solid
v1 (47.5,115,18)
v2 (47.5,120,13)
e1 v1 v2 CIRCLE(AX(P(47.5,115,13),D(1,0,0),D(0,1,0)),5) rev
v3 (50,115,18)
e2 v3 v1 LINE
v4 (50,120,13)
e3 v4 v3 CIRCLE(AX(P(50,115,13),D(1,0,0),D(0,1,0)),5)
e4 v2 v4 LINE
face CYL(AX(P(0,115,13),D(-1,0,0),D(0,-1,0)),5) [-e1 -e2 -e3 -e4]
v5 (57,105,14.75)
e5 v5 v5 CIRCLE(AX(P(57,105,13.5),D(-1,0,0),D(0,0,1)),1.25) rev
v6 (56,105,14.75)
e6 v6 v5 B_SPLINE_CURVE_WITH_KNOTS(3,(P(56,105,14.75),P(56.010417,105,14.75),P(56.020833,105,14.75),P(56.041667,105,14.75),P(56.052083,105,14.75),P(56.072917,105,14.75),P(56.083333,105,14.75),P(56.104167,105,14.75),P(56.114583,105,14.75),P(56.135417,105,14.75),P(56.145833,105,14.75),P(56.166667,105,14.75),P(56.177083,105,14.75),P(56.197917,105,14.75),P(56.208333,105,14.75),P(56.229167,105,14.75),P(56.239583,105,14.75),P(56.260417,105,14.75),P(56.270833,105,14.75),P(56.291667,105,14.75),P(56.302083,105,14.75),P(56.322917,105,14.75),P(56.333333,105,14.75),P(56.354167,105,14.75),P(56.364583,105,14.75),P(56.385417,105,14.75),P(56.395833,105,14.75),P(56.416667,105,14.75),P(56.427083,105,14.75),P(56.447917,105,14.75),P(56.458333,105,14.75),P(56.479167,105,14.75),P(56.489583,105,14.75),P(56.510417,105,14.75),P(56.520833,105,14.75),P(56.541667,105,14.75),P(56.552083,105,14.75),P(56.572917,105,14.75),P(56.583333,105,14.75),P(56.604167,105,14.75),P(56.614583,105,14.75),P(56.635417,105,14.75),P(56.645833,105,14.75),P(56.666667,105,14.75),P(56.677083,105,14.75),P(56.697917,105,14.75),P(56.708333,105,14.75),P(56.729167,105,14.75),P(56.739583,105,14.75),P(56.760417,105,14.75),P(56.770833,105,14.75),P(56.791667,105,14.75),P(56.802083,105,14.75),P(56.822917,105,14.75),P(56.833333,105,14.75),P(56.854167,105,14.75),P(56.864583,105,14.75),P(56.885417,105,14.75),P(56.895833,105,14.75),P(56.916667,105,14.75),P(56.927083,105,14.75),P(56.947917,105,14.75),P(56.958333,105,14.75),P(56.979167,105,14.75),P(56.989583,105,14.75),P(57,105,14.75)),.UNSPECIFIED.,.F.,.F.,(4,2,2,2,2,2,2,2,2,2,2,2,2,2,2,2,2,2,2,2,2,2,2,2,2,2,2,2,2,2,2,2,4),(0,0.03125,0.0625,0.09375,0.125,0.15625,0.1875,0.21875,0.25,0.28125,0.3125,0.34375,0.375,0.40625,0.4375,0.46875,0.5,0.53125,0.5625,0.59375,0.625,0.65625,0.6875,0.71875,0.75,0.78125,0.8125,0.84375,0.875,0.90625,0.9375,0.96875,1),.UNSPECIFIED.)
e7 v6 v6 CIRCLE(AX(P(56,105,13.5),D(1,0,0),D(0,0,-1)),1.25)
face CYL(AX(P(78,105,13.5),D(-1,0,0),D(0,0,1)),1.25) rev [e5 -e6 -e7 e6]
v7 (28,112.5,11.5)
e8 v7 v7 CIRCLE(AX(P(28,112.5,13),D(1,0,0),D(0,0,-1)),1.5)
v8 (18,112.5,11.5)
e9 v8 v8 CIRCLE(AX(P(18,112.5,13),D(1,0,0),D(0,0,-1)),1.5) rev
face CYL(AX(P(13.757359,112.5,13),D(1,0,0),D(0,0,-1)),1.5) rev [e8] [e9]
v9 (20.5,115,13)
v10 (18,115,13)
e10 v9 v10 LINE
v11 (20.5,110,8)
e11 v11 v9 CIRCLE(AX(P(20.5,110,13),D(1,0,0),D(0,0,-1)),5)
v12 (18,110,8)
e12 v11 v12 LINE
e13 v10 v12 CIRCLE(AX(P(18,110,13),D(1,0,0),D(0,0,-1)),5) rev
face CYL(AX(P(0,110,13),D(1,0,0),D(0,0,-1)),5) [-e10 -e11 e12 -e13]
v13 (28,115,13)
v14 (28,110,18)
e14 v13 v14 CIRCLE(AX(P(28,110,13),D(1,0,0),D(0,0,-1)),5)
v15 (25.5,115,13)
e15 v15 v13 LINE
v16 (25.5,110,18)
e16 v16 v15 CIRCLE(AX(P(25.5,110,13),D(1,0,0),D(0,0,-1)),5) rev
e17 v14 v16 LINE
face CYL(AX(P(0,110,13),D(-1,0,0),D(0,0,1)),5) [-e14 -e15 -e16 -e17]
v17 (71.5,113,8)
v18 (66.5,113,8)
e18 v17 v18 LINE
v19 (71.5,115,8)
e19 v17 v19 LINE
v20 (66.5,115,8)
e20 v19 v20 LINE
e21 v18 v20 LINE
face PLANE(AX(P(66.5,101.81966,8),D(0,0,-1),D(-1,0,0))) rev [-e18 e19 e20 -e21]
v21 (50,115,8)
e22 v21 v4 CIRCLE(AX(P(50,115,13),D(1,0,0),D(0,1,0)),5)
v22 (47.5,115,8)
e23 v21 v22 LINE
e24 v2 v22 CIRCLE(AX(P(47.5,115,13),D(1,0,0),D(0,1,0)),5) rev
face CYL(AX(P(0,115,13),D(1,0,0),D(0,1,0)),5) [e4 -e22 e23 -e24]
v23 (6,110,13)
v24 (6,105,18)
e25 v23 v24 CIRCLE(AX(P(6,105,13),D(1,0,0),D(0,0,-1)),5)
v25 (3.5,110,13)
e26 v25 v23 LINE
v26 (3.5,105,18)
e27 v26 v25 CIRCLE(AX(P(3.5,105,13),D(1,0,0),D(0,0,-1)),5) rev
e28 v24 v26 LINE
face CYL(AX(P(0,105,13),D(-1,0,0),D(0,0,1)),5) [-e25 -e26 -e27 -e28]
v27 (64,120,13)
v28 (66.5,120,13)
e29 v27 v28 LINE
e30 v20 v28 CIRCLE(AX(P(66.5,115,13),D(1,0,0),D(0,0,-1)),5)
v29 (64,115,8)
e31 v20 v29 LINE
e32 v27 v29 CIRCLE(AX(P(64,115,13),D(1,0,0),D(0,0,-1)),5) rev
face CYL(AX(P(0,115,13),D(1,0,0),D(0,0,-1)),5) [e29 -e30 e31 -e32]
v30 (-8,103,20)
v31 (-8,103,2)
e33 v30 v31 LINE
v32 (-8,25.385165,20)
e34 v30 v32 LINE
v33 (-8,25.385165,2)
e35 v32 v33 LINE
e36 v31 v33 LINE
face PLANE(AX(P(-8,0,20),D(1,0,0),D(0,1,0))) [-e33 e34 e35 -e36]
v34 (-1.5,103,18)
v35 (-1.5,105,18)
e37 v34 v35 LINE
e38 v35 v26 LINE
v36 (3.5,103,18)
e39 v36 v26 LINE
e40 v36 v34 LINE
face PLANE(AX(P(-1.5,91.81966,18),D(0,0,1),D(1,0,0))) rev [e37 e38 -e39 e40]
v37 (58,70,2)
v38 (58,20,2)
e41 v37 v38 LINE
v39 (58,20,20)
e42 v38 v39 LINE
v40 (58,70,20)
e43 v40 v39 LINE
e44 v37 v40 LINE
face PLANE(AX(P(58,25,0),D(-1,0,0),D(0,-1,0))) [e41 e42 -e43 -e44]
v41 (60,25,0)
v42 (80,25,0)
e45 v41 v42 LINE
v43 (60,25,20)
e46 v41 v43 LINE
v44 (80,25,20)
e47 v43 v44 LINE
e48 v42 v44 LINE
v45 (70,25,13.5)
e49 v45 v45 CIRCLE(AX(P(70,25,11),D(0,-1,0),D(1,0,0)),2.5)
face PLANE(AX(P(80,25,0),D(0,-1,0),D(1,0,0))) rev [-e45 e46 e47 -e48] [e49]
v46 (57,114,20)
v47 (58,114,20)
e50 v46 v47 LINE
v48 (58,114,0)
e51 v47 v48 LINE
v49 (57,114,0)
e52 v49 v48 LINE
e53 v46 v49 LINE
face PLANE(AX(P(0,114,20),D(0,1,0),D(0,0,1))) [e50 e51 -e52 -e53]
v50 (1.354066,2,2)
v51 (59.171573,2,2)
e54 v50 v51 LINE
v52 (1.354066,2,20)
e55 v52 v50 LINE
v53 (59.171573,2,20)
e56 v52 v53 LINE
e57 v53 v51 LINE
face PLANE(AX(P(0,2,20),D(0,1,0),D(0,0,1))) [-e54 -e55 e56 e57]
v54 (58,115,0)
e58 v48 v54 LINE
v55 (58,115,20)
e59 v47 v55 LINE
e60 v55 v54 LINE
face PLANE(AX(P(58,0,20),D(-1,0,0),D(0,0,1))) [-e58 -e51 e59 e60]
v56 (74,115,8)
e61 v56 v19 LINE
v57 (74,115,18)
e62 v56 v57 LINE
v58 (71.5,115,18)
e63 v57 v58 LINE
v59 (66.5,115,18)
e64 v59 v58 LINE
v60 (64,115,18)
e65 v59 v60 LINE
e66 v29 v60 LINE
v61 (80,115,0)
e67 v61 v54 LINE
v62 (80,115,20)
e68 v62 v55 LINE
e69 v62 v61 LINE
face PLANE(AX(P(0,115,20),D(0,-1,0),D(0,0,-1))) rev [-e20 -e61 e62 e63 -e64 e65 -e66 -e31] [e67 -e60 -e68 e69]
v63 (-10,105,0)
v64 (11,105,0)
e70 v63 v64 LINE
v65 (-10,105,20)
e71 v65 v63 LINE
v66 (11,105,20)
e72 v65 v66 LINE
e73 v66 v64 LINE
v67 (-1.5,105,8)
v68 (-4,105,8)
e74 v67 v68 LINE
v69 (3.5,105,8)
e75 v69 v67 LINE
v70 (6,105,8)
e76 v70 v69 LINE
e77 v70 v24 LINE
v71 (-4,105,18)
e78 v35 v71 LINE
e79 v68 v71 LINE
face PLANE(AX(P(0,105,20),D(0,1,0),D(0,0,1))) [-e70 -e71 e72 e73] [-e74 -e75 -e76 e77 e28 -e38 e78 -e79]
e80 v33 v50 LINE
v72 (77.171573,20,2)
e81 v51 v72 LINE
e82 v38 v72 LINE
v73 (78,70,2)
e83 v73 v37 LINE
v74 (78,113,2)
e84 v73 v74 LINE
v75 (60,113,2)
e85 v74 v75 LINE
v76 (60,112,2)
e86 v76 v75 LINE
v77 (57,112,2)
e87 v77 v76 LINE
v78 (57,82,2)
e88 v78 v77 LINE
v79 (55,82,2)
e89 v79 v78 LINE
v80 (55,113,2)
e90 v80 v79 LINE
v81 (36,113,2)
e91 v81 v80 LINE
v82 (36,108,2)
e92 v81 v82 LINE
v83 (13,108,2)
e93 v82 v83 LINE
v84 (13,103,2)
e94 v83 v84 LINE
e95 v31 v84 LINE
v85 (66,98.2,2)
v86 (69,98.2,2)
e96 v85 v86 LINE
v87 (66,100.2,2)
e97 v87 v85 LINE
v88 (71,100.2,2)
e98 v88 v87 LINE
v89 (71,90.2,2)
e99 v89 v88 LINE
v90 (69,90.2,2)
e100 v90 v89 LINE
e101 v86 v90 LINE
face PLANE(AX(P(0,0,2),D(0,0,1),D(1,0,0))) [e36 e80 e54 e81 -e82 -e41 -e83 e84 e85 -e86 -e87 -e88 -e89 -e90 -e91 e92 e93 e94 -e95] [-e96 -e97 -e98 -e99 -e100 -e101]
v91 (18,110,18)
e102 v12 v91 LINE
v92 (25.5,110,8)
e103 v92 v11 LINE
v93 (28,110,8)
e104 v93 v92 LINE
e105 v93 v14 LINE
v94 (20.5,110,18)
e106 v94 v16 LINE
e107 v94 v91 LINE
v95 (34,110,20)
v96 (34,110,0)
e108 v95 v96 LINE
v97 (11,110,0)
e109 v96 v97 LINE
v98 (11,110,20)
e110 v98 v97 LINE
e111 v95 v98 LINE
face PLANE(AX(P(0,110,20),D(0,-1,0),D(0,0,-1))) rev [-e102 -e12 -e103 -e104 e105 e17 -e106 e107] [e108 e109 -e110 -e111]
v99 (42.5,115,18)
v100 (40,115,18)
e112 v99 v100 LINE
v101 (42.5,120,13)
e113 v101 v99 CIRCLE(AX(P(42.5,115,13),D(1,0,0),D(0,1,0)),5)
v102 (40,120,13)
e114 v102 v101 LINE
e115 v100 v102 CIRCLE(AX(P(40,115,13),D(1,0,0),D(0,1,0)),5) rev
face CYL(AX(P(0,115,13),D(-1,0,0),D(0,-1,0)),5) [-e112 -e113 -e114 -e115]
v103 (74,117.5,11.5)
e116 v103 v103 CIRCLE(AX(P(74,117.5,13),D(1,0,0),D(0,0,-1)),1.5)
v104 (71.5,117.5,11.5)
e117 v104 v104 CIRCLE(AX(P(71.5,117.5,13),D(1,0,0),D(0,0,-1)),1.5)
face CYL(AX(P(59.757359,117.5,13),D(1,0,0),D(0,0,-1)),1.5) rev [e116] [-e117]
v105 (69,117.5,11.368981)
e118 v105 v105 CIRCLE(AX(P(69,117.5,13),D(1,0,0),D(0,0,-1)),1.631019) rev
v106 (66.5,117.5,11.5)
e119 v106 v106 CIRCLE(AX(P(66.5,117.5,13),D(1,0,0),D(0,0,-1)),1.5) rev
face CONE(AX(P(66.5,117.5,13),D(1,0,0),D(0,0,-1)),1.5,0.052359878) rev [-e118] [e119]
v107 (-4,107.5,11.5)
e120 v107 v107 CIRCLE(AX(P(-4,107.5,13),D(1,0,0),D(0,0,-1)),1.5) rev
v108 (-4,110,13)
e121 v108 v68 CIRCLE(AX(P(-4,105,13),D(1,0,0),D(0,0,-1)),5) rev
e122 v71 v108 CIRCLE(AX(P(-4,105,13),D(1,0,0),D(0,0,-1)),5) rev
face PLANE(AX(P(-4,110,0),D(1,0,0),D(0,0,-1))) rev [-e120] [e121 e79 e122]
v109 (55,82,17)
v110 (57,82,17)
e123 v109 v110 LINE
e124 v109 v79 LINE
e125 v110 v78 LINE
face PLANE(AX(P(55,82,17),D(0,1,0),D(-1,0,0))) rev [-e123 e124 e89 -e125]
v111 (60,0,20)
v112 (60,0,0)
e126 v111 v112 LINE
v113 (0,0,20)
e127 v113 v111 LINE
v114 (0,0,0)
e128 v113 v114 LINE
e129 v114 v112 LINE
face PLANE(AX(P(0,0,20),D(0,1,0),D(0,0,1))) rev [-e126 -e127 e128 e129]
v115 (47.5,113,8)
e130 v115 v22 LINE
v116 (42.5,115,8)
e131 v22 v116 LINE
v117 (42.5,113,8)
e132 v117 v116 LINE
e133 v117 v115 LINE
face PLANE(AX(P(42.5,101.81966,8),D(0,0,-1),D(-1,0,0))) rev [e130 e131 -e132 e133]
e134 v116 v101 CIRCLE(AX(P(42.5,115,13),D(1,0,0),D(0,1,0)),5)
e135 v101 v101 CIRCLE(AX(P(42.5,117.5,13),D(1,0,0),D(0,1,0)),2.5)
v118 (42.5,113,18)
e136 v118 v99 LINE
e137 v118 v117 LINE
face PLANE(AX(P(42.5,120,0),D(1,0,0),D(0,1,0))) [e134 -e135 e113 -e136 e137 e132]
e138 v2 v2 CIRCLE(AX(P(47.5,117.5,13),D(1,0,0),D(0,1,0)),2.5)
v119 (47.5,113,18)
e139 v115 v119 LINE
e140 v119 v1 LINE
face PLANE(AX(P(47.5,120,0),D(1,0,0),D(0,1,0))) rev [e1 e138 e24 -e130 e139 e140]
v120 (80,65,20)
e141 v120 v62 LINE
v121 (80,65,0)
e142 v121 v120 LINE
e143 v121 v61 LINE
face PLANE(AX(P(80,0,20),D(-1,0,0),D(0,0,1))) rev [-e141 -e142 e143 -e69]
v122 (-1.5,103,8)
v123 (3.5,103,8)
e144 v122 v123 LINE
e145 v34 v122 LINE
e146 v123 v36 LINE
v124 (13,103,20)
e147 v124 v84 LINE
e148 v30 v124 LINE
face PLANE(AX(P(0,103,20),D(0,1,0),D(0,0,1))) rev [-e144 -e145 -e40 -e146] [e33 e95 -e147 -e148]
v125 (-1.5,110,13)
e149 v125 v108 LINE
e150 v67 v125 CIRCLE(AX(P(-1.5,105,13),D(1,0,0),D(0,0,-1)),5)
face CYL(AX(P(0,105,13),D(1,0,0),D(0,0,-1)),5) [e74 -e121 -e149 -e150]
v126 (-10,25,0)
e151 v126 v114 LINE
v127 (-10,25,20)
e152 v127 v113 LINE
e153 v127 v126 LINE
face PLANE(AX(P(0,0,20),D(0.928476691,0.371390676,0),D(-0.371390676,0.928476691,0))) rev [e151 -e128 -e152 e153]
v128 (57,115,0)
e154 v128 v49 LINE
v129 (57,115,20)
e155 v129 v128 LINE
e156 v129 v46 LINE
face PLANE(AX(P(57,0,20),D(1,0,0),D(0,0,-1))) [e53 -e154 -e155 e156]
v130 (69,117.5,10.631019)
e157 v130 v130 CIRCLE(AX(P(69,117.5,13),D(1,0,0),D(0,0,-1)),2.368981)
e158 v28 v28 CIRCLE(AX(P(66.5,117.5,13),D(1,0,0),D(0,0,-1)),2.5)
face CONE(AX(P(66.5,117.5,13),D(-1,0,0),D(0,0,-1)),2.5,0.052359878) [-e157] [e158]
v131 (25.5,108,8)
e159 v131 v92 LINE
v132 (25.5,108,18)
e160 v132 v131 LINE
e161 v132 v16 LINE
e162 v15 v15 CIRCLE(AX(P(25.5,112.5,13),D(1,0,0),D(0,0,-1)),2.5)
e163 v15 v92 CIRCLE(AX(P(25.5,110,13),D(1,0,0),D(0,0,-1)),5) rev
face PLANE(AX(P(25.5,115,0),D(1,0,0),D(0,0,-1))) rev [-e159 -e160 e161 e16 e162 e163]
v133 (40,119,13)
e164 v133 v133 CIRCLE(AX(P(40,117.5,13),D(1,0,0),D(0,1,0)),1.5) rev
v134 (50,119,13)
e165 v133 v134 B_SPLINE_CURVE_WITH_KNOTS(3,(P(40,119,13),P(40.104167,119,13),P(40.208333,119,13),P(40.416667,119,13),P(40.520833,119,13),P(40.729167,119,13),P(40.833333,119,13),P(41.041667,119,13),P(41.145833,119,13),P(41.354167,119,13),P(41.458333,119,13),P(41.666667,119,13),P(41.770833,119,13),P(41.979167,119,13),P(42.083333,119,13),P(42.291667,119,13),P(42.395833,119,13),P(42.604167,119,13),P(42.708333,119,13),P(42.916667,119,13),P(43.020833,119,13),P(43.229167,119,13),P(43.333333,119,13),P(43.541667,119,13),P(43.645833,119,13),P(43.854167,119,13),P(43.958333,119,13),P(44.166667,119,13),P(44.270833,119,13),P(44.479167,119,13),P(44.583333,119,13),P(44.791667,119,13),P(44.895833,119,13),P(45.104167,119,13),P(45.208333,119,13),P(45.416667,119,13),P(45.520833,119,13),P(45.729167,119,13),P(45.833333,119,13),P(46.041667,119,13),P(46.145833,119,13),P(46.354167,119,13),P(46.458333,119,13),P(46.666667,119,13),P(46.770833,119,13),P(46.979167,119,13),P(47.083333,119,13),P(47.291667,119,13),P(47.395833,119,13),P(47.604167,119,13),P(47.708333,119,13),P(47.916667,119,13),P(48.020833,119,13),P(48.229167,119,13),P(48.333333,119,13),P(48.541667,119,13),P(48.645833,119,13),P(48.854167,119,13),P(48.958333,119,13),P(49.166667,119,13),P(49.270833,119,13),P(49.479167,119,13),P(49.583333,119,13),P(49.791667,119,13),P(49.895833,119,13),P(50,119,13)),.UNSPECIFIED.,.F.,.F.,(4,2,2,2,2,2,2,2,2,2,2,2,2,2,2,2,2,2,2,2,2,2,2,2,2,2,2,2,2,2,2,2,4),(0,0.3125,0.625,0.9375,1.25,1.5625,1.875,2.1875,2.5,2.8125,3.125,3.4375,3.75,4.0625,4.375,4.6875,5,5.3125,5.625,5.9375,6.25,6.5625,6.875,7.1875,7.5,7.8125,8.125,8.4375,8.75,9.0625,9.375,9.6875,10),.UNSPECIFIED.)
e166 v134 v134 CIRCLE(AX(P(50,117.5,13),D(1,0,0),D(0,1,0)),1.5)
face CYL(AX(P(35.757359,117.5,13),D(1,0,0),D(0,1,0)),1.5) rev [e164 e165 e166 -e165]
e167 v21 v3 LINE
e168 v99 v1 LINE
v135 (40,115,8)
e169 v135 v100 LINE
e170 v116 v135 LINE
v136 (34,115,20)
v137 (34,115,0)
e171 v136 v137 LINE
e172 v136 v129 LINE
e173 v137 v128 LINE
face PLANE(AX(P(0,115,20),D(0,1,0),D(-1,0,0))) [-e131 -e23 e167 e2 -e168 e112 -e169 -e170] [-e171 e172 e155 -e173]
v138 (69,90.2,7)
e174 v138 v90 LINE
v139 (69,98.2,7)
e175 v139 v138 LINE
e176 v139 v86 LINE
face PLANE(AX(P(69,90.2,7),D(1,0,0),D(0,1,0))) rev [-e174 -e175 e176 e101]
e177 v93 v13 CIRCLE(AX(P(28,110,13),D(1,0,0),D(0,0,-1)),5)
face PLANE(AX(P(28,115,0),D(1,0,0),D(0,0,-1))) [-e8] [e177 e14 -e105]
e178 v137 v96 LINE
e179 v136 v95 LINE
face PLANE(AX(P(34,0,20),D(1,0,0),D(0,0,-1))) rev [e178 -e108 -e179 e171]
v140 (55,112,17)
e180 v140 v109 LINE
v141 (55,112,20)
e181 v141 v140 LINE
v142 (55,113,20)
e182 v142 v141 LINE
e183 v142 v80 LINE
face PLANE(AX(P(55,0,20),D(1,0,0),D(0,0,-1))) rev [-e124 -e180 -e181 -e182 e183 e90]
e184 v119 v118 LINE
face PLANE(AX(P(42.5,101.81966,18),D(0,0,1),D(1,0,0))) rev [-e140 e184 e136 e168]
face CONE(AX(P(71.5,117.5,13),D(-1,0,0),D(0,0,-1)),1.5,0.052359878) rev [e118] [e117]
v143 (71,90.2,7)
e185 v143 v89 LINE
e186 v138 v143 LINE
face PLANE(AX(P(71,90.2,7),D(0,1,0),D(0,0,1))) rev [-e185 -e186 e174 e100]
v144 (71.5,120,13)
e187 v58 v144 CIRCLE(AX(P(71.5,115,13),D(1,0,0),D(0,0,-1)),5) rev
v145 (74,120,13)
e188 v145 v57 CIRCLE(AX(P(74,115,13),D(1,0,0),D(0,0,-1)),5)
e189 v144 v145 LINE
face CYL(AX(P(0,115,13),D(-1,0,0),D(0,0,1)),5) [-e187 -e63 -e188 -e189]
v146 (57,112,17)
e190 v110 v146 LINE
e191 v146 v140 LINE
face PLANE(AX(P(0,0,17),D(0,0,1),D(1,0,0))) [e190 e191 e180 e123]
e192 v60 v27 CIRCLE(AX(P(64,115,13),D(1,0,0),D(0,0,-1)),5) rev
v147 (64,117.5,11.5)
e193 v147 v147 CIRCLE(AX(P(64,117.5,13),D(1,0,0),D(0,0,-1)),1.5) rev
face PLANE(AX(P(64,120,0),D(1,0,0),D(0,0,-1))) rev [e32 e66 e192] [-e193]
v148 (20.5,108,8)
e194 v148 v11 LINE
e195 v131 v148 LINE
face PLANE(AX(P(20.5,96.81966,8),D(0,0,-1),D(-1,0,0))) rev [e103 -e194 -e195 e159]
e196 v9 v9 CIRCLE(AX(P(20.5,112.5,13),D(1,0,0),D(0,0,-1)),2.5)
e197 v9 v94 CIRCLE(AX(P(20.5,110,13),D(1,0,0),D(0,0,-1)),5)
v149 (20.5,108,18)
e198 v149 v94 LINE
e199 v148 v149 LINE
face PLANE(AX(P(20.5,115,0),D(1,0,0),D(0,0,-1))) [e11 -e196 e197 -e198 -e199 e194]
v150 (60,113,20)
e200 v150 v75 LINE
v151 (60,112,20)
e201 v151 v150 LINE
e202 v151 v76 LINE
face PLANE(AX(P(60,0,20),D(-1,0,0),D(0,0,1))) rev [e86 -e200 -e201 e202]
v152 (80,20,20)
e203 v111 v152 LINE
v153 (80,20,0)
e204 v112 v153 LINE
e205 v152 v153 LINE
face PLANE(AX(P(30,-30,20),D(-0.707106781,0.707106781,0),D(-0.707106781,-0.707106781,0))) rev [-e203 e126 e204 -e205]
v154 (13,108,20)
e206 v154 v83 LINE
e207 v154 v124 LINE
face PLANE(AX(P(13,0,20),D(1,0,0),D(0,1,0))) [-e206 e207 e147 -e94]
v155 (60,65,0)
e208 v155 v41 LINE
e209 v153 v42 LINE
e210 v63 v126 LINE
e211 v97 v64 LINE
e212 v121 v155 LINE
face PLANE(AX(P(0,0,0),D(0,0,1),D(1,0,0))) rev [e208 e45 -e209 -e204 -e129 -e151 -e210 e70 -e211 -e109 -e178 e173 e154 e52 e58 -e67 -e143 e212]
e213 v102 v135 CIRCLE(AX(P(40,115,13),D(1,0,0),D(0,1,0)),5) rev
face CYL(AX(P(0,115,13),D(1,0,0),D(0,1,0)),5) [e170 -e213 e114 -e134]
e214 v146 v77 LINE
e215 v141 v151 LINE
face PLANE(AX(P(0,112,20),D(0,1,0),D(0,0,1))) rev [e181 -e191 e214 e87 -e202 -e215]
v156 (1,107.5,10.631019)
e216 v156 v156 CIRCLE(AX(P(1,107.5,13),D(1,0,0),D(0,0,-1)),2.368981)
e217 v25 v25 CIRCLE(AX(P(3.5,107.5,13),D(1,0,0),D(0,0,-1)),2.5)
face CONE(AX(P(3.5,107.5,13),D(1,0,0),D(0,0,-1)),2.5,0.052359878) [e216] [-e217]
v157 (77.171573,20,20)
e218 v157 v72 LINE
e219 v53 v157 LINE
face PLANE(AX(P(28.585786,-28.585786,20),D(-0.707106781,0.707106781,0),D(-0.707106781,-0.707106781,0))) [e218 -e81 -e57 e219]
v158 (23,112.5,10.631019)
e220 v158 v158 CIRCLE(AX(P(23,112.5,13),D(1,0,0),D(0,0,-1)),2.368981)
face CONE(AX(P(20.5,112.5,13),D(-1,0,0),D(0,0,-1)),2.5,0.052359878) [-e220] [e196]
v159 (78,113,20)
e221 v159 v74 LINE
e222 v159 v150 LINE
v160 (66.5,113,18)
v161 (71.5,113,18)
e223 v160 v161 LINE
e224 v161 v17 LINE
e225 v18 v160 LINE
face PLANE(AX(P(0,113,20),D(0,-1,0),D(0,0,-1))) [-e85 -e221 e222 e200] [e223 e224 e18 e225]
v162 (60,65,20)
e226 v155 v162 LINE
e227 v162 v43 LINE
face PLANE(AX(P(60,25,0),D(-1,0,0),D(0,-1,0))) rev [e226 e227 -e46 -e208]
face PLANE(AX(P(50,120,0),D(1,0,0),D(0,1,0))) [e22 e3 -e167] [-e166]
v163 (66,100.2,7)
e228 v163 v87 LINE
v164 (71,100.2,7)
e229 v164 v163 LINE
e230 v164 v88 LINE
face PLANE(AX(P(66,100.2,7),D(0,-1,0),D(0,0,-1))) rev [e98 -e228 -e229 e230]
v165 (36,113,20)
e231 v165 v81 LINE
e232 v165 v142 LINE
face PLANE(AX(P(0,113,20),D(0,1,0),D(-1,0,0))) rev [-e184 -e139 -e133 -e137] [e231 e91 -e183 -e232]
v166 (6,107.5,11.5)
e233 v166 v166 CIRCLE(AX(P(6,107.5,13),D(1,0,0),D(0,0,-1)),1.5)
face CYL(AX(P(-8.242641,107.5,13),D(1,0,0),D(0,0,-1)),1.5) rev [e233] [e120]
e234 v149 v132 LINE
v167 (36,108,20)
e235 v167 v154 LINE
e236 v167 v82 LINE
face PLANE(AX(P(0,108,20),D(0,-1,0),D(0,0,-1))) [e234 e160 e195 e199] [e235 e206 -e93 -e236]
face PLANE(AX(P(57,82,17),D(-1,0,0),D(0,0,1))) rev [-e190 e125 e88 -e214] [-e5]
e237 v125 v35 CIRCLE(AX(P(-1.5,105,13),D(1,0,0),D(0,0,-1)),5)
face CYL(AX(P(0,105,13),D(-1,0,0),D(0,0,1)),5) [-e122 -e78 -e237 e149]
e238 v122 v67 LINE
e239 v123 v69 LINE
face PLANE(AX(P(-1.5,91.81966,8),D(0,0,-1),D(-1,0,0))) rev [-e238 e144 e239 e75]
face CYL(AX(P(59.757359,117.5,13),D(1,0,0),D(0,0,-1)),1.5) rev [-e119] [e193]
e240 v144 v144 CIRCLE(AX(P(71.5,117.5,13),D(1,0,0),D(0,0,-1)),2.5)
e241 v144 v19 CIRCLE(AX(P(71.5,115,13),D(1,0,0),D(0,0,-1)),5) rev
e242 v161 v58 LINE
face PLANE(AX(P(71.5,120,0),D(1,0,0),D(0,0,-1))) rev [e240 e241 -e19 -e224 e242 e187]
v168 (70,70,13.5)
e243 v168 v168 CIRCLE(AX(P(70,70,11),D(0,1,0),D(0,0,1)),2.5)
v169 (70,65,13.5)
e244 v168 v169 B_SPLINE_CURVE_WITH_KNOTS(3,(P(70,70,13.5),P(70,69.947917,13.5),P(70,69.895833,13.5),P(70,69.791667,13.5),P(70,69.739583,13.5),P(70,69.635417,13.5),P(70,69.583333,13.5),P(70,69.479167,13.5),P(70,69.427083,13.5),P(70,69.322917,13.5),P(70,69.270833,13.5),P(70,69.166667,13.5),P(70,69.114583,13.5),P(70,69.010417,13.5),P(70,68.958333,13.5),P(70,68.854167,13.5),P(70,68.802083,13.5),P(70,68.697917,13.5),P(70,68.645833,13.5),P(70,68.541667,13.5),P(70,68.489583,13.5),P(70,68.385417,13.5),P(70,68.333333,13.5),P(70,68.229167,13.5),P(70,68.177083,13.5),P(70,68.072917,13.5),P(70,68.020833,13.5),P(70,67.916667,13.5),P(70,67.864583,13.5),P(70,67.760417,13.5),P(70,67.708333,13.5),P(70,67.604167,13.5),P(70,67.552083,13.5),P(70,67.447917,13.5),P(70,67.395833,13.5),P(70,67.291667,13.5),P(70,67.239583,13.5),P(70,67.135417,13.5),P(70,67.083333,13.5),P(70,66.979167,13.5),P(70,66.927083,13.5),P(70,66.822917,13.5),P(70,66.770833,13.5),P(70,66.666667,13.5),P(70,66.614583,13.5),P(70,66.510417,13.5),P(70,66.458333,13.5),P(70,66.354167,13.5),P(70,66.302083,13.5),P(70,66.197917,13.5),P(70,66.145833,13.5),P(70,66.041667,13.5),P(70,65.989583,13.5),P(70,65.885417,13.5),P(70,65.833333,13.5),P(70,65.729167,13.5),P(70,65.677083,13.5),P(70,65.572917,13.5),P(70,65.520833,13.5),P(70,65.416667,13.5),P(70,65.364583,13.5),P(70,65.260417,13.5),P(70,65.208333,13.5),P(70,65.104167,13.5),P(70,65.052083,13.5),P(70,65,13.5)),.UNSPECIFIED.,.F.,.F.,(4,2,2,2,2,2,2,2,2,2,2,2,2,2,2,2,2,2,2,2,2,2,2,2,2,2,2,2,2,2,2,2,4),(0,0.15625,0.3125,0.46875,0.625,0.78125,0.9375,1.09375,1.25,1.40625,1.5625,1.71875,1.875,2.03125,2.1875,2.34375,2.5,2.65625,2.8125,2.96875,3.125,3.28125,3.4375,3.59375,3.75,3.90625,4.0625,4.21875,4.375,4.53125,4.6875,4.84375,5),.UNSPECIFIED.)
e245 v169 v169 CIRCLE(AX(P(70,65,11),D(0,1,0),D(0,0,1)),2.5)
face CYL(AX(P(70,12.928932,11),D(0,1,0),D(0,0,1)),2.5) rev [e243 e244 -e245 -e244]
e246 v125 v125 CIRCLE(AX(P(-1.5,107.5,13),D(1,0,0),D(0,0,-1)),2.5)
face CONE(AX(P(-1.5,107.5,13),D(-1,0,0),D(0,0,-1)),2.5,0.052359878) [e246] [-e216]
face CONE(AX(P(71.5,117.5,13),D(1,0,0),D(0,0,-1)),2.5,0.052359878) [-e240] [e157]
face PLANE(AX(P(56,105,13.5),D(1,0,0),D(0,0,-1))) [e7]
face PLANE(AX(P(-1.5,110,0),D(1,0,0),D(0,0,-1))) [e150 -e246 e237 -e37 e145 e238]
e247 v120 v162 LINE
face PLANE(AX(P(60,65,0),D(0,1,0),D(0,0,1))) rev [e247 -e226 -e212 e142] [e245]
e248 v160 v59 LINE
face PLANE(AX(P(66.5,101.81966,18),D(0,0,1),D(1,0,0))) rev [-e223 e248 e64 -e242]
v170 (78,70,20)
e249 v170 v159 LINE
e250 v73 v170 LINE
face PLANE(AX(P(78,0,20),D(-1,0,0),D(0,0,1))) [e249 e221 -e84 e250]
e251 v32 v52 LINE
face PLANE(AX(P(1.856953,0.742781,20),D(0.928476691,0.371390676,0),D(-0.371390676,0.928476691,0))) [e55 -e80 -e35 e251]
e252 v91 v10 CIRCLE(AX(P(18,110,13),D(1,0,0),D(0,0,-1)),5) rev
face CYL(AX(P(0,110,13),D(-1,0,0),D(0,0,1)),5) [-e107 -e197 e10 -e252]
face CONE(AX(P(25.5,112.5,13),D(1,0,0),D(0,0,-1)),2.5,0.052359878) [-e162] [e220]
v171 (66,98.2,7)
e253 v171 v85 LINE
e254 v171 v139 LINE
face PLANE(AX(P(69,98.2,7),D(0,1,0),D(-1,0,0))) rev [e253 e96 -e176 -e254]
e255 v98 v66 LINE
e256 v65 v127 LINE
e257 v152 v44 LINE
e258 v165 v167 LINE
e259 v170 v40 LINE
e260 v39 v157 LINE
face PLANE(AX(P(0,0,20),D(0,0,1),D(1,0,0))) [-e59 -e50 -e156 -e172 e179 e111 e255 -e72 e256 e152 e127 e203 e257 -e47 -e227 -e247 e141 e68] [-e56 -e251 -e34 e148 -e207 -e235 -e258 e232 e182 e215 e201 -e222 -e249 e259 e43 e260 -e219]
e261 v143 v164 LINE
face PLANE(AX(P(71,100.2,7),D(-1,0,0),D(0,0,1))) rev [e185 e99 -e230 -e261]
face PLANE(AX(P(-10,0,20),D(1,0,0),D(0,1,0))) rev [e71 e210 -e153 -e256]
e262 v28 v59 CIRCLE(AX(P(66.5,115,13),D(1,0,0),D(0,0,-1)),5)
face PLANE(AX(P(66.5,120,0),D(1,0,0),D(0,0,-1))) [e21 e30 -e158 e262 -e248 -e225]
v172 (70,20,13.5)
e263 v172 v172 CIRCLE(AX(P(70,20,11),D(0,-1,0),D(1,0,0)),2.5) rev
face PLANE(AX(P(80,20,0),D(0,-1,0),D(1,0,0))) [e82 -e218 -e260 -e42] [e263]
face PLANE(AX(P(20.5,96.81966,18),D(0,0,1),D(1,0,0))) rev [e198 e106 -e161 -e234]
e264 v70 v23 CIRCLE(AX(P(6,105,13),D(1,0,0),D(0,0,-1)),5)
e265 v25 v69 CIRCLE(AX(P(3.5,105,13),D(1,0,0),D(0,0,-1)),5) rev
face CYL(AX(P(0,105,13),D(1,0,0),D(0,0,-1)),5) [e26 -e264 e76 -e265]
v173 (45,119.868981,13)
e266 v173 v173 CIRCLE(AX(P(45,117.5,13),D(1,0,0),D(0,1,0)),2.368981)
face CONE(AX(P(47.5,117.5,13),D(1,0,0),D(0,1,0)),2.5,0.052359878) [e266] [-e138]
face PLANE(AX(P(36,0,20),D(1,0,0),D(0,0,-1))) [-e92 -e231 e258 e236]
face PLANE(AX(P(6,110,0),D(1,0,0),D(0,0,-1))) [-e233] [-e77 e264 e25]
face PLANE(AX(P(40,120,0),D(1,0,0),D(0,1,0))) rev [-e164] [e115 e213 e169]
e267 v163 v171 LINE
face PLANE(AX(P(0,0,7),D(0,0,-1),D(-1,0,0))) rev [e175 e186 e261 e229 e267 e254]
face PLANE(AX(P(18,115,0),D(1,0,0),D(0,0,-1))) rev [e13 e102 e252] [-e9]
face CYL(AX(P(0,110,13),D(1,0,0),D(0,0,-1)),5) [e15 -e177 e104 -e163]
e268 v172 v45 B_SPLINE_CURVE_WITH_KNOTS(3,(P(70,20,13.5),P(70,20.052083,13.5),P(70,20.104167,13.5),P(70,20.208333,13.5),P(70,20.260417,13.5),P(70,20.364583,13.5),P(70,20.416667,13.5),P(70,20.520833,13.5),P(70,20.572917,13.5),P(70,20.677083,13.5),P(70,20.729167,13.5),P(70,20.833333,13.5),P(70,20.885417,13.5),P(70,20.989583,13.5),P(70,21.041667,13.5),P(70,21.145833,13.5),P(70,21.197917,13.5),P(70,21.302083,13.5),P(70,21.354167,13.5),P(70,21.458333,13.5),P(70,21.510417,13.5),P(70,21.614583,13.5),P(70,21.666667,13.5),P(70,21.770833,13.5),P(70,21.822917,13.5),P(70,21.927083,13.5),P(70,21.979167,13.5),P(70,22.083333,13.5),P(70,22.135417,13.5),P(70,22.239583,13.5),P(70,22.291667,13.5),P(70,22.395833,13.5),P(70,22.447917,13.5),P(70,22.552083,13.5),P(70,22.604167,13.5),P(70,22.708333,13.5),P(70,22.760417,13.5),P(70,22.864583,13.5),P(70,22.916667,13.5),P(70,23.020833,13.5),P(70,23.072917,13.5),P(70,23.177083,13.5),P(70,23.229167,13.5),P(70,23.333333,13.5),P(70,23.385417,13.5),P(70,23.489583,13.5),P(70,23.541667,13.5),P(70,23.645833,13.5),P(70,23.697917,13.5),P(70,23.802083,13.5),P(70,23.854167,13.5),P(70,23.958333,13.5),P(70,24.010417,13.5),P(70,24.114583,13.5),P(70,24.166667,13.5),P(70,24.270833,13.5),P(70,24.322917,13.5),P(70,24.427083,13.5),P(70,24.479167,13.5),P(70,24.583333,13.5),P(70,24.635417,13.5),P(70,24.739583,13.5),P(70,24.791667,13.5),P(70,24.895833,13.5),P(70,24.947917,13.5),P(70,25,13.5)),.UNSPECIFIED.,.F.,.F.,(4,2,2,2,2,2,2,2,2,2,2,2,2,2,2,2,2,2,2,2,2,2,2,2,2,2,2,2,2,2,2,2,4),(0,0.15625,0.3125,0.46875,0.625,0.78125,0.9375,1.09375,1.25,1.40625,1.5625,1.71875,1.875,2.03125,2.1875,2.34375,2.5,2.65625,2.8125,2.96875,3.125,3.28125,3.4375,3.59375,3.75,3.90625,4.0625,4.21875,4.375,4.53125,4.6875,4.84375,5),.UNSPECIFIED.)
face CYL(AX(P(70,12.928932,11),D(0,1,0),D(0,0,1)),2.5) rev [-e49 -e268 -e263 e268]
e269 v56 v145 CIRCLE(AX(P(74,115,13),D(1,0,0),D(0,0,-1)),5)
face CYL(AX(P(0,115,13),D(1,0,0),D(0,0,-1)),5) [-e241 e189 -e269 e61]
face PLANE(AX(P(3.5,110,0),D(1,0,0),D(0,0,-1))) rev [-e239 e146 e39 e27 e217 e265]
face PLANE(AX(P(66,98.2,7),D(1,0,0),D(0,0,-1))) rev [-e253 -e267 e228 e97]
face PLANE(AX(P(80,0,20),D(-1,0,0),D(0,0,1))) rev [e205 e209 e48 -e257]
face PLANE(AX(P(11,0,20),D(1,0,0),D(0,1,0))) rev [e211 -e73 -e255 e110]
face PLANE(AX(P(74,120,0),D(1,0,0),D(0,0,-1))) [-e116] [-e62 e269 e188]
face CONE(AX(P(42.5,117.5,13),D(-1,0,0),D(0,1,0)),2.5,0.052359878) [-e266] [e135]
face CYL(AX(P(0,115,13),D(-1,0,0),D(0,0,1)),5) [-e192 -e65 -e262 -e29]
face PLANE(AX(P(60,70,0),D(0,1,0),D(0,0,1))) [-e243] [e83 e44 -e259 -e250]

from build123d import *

# Parameters (mm, degrees)
BOSS_EXTRUDE1_DEPTH       = 20
SKETCH2_W                 = 20
SKETCH2_H                 = 40
CUT_EXTRUDE1_DEPTH        = 142.509716981
SHELL1_T                  = -2
SHELL1_THICKNESS_2_FACE_W = 20
SHELL1_THICKNESS_2_FACE_H = 18
SHELL1_THICKNESS_2_DEPTH  = 3
SHELL1_THICKNESS_3_FACE_W = 18
SHELL1_THICKNESS_3_FACE_H = 20
SHELL1_THICKNESS_3_DEPTH  = 3
CUT_EXTRUDE14_REACH       = 110.167
SKETCH34_R                = 2.5
SKETCH3_W                 = 2.5
SKETCH3_H                 = 10
BOSS_EXTRUDE2_DEPTH       = 5
FILLET2_R                 = 5
CUT_EXTRUDE3_REACH        = 149.838
SKETCH6_R                 = 1.5
SKETCH21_R                = 2.5
SKETCH21_R_2              = 1.5
BOSS_EXTRUDE10_DEPTH      = 2.5
BOSS_EXTRUDE10_DRAFT      = 3
MIRROR7_COPY_1_SKETCH_R   = 2.5
MIRROR7_COPY_1_SKETCH_R_2 = 1.5
MIRROR7_COPY_1_DEPTH      = 2.5
MIRROR7_COPY_1_DRAFT      = 3
SKETCH26_W                = 5
SKETCH26_H                = 10
CUT_EXTRUDE8_DEPTH        = 2
SKETCH7_W                 = 2.5
SKETCH7_H                 = 10
BOSS_EXTRUDE4_DEPTH       = 5
FILLET4_R                 = 5
SKETCH22_R                = 2.5
BOSS_EXTRUDE11_DEPTH      = 2.5
BOSS_EXTRUDE11_TAPER      = 3
SKETCH23_R                = 1.5
CUT_EXTRUDE7_DEPTH        = 10
SKETCH27_W                = 5
SKETCH27_H                = 10
CUT_EXTRUDE9_DEPTH        = 2
SKETCH10_W                = 2.5
SKETCH10_H                = 10
BOSS_EXTRUDE6_DEPTH       = 5
FILLET6_R                 = 5
SKETCH28_R                = 2.5
BOSS_EXTRUDE12_DEPTH      = 2.5
BOSS_EXTRUDE12_TAPER      = 3
SKETCH29_R                = 1.5
CUT_EXTRUDE10_DEPTH       = 10
SKETCH30_W                = 5
SKETCH30_H                = 10
CUT_EXTRUDE11_DEPTH       = 2
SKETCH13_W                = 2.5
SKETCH13_H                = 10
BOSS_EXTRUDE8_DEPTH       = 5
FILLET8_R                 = 5
SKETCH31_R                = 2.5
BOSS_EXTRUDE13_DEPTH      = 2.5
BOSS_EXTRUDE13_TAPER      = 3
SKETCH32_R                = 1.5
CUT_EXTRUDE12_DEPTH       = 10
SKETCH33_W                = 5
SKETCH33_H                = 10
CUT_EXTRUDE13_DEPTH       = 2
SKETCH38_W                = 2
SKETCH38_H                = 30
BOSS_EXTRUDE14_DEPTH      = 15
BOSS_EXTRUDE15_DEPTH      = 5
CUT_EXTRUDE15_DEPTH       = 21
CUT_EXTRUDE15_DEPTH_BACK  = 1
SKETCH40_R                = 1.25


with BuildPart() as part:
    # Sketch1 → Boss-Extrude1 (new body)
    with BuildSketch(Plane.XY):
        Polygon((58, 114), (58, 115), (80, 115), (80, 20), (60, 0), (0, 0), (-10, 25), (-10, 105), (11, 105), (11, 110), (12, 110), (34, 110), (34, 115), (35, 115), (57, 115), (57, 114), align=None)
    extrude(amount=BOSS_EXTRUDE1_DEPTH)

    # Sketch2 → Cut-Extrude1 (cut, through all)
    with BuildSketch(Plane.XY.offset(20)):
        with Locations((70, 45)):
            Rectangle(SKETCH2_W, SKETCH2_H)
    extrude(amount=-CUT_EXTRUDE1_DEPTH, mode=Mode.SUBTRACT)

    # Shell1
    shell1_openings = [part.faces().sort_by_distance(p)[0] for p in [
        (32.550473836, 58.500730419, 20),
    ]]
    offset(amount=SHELL1_T, openings=shell1_openings, kind=Kind.INTERSECTION)

    # Shell1 thickness 2 face (on inner face of the shell) → Shell1 thickness 2 (add)
    with BuildSketch(Plane(origin=(68, 23, 11), x_dir=(1, 0, 0), z_dir=(0, 1, 0))):
        Rectangle(SHELL1_THICKNESS_2_FACE_W, SHELL1_THICKNESS_2_FACE_H)
    extrude(amount=-SHELL1_THICKNESS_2_DEPTH)

    # Shell1 thickness 3 face (on inner face of the shell) → Shell1 thickness 3 (add)
    with BuildSketch(Plane(origin=(68, 67, 11), x_dir=(0, 0, -1), z_dir=(0, -1, 0))):
        Rectangle(SHELL1_THICKNESS_3_FACE_W, SHELL1_THICKNESS_3_FACE_H)
    extrude(amount=-SHELL1_THICKNESS_3_DEPTH)

    # Cut-Extrude14: up to this face of the body (flat: up to its plane)
    cut_extrude14_end = Plane(part.part.faces().sort_by_distance((67.585786438, 20, 11))[0])
    # Sketch34 → Cut-Extrude14 (cut, up to the picked face)
    with BuildSketch(Plane(origin=(0, 70, 0), x_dir=(1, 0, 0), z_dir=(0, 1, 0)), mode=Mode.PRIVATE) as cut_extrude14_sk1:
        with Locations(Location((70, -11, 0), (0, 0, 270))):
            Circle(SKETCH34_R)
    cut_extrude14_tool1 = split(extrude(cut_extrude14_sk1.sketch, amount=-CUT_EXTRUDE14_REACH, mode=Mode.PRIVATE), bisect_by=cut_extrude14_end, keep=Keep.BOTH, mode=Mode.PRIVATE)
    add(cut_extrude14_tool1.solids().sort_by(Axis((70, 70, 11), (0, -1, 0)))[0], mode=Mode.SUBTRACT)

    # Sketch3 → Boss-Extrude2 (add)
    with BuildSketch(Plane(origin=(0, 115, 0), x_dir=(1, 0, 0), z_dir=(0, 1, 0))):
        with Locations((65.25, -13)):
            Rectangle(SKETCH3_W, SKETCH3_H)
        with Locations((72.75, -13)):
            Rectangle(SKETCH3_W, SKETCH3_H)
    extrude(amount=BOSS_EXTRUDE2_DEPTH)

    # Fillet2
    fillet2_edges = [part.edges().sort_by_distance(p)[0] for p in [
        (65.25, 120, 8),
        (65.25, 120, 18),
        (72.75, 120, 8),
        (72.75, 120, 18),
    ]]
    fillet(fillet2_edges, radius=FILLET2_R - 0.0001)  # a hair under: the kernel refuses the full size

    # Cut-Extrude3: up to this face of the body (flat: up to its plane)
    cut_extrude3_end = Plane(part.part.faces().sort_by_distance((64, 117.122079053, 13))[0])
    # Sketch6 → Cut-Extrude3 (cut, up to the picked face)
    with BuildSketch(Plane(origin=(74, 0, 0), x_dir=(0, 0, -1), z_dir=(1, 0, 0)), mode=Mode.PRIVATE) as cut_extrude3_sk1:
        with Locations((-13, 117.5)):
            Circle(SKETCH6_R)
    cut_extrude3_tool1 = split(extrude(cut_extrude3_sk1.sketch, amount=-CUT_EXTRUDE3_REACH, mode=Mode.PRIVATE), bisect_by=cut_extrude3_end, keep=Keep.BOTH, mode=Mode.PRIVATE)
    add(cut_extrude3_tool1.solids().sort_by(Axis((74, 117.5, 13), (-1, 0, 0)))[0], mode=Mode.SUBTRACT)


with BuildPart() as boss_extrude10_tool:
    # Sketch21 → Boss-Extrude10 (with draft: the straight prism first)
    with BuildSketch(Plane(origin=(66.5, 0, 0), x_dir=(0, 0, -1), z_dir=(1, 0, 0))):
        with Locations((-13, 117.5)):
            Circle(SKETCH21_R)
        with Locations((-13, 117.5)):
            Circle(SKETCH21_R_2, mode=Mode.SUBTRACT)
    extrude(amount=BOSS_EXTRUDE10_DEPTH)
    # Boss-Extrude10: the draft: its side faces are tilted about the plane it starts from
    boss_extrude10_sides = [boss_extrude10_tool.faces().sort_by_distance(p)[0] for p in [
        (67.75, 117.5, 15.5),
        (67.75, 117.5, 14.5),
    ]]
    draft(boss_extrude10_sides, Plane(origin=(66.5, 0, 0), x_dir=(0, 0, -1), z_dir=(1, 0, 0)), BOSS_EXTRUDE10_DRAFT)


with BuildPart() as part_1:
    add(part.part)

    # Boss-Extrude10: add boss_extrude10_tool
    add(boss_extrude10_tool.part)


with BuildPart() as mirror7_copy_1_tool:
    # Mirror7 copy 1 sketch → Mirror7 copy 1 (with draft: the straight prism first)
    with BuildSketch(Plane(origin=(71.5, 0, 0), x_dir=(0, 0, -1), z_dir=(-1, 0, 0))):
        with Locations((-13, -117.5)):
            Circle(MIRROR7_COPY_1_SKETCH_R)
        with Locations((-13, -117.5)):
            Circle(MIRROR7_COPY_1_SKETCH_R_2, mode=Mode.SUBTRACT)
    extrude(amount=MIRROR7_COPY_1_DEPTH)
    # Mirror7 copy 1: the draft: its side faces are tilted about the plane it starts from
    mirror7_copy_1_sides = [mirror7_copy_1_tool.faces().sort_by_distance(p)[0] for p in [
        (70.25, 117.5, 15.5),
        (70.25, 117.5, 14.5),
    ]]
    draft(mirror7_copy_1_sides, Plane(origin=(71.5, 0, 0), x_dir=(0, 0, -1), z_dir=(-1, 0, 0)), MIRROR7_COPY_1_DRAFT)


with BuildPart() as part_2:
    add(part_1.part)

    # Mirror7 copy 1: add mirror7_copy_1_tool
    add(mirror7_copy_1_tool.part)

    # Sketch26 → Cut-Extrude8 (cut)
    with BuildSketch(Plane(origin=(0, 115, 0), x_dir=(1, 0, 0), z_dir=(0, 1, 0))):
        with Locations((69, -13)):
            Rectangle(SKETCH26_W, SKETCH26_H)
    extrude(amount=-CUT_EXTRUDE8_DEPTH, mode=Mode.SUBTRACT)

    # Sketch7 → Boss-Extrude4 (add)
    with BuildSketch(Plane(origin=(0, 115, 0), x_dir=(1, 0, 0), z_dir=(0, 1, 0))):
        with Locations((41.25, -13)):
            Rectangle(SKETCH7_W, SKETCH7_H)
        with Locations((48.75, -13)):
            Rectangle(SKETCH7_W, SKETCH7_H)
    extrude(amount=BOSS_EXTRUDE4_DEPTH)

    # Fillet4
    fillet4_edges = [part_2.edges().sort_by_distance(p)[0] for p in [
        (41.25, 120, 8),
        (41.25, 120, 18),
        (48.75, 120, 8),
        (48.75, 120, 18),
    ]]
    fillet(fillet4_edges, radius=FILLET4_R - 0.0001)  # a hair under: the kernel refuses the full size

    # Sketch22 → Boss-Extrude11 (add)
    with BuildSketch(Plane(origin=(42.5, 0, 0), x_dir=(0, 0, -1), z_dir=(1, 0, 0))):
        with Locations((-13, 117.5)):
            Circle(SKETCH22_R)
    boss_extrude11 = extrude(amount=BOSS_EXTRUDE11_DEPTH, taper=BOSS_EXTRUDE11_TAPER)

    # Mirror8: Boss-Extrude11 across plane
    add(boss_extrude11.mirror(Plane(origin=(45, 117.5, 13), x_dir=(0, 0, 1), z_dir=(1, 0, 0))))

    # Sketch23 → Cut-Extrude7 (cut)
    with BuildSketch(Plane(origin=(50, 0, 0), x_dir=(0, 0, -1), z_dir=(1, 0, 0))):
        with Locations((-13, 117.5)):
            Circle(SKETCH23_R)
    extrude(amount=-CUT_EXTRUDE7_DEPTH, mode=Mode.SUBTRACT)

    # Sketch27 → Cut-Extrude9 (cut)
    with BuildSketch(Plane(origin=(0, 115, 0), x_dir=(1, 0, 0), z_dir=(0, 1, 0))):
        with Locations((45, -13)):
            Rectangle(SKETCH27_W, SKETCH27_H)
    extrude(amount=-CUT_EXTRUDE9_DEPTH, mode=Mode.SUBTRACT)

    # Sketch10 → Boss-Extrude6 (add)
    with BuildSketch(Plane(origin=(0, 110, 0), x_dir=(1, 0, 0), z_dir=(0, 1, 0))):
        with Locations((19.25, -13)):
            Rectangle(SKETCH10_W, SKETCH10_H)
        with Locations((26.75, -13)):
            Rectangle(SKETCH10_W, SKETCH10_H)
    extrude(amount=BOSS_EXTRUDE6_DEPTH)

    # Fillet6
    fillet6_edges = [part_2.edges().sort_by_distance(p)[0] for p in [
        (19.25, 115, 18),
        (19.25, 115, 8),
        (26.75, 115, 8),
        (26.75, 115, 18),
    ]]
    fillet(fillet6_edges, radius=FILLET6_R - 0.0001)  # a hair under: the kernel refuses the full size

    # Sketch28 → Boss-Extrude12 (add)
    with BuildSketch(Plane(origin=(20.5, 0, 0), x_dir=(0, 0, -1), z_dir=(1, 0, 0))):
        with Locations((-13, 112.5)):
            Circle(SKETCH28_R)
    boss_extrude12 = extrude(amount=BOSS_EXTRUDE12_DEPTH, taper=BOSS_EXTRUDE12_TAPER)

    # Mirror9: Boss-Extrude12 across plane
    add(boss_extrude12.mirror(Plane(origin=(23, 112.5, 13), x_dir=(0, 0, 1), z_dir=(1, 0, 0))))

    # Sketch29 → Cut-Extrude10 (cut)
    with BuildSketch(Plane(origin=(28, 0, 0), x_dir=(0, 0, -1), z_dir=(1, 0, 0))):
        with Locations((-13, 112.5)):
            Circle(SKETCH29_R)
    extrude(amount=-CUT_EXTRUDE10_DEPTH, mode=Mode.SUBTRACT)

    # Sketch30 → Cut-Extrude11 (cut)
    with BuildSketch(Plane(origin=(0, 110, 0), x_dir=(1, 0, 0), z_dir=(0, 1, 0))):
        with Locations((23, -13)):
            Rectangle(SKETCH30_W, SKETCH30_H)
    extrude(amount=-CUT_EXTRUDE11_DEPTH, mode=Mode.SUBTRACT)

    # Sketch13 → Boss-Extrude8 (add)
    with BuildSketch(Plane(origin=(0, 105, 0), x_dir=(1, 0, 0), z_dir=(0, 1, 0))):
        with Locations((-2.75, -13)):
            Rectangle(SKETCH13_W, SKETCH13_H)
        with Locations((4.75, -13)):
            Rectangle(SKETCH13_W, SKETCH13_H)
    extrude(amount=BOSS_EXTRUDE8_DEPTH)

    # Fillet8
    fillet8_edges = [part_2.edges().sort_by_distance(p)[0] for p in [
        (-2.75, 110, 18),
        (-2.75, 110, 8),
        (4.75, 110, 8),
        (4.75, 110, 18),
    ]]
    fillet(fillet8_edges, radius=FILLET8_R - 0.0001)  # a hair under: the kernel refuses the full size

    # Sketch31 → Boss-Extrude13 (add)
    with BuildSketch(Plane(origin=(-1.5, 0, 0), x_dir=(0, 0, -1), z_dir=(1, 0, 0))):
        with Locations((-13, 107.5)):
            Circle(SKETCH31_R)
    boss_extrude13 = extrude(amount=BOSS_EXTRUDE13_DEPTH, taper=BOSS_EXTRUDE13_TAPER)

    # Mirror10: Boss-Extrude13 across plane
    add(boss_extrude13.mirror(Plane(origin=(1, 107.5, 13), x_dir=(0, 0, 1), z_dir=(1, 0, 0))))

    # Sketch32 → Cut-Extrude12 (cut)
    with BuildSketch(Plane(origin=(6, 0, 0), x_dir=(0, 0, -1), z_dir=(1, 0, 0))):
        with Locations((-13, 107.5)):
            Circle(SKETCH32_R)
    extrude(amount=-CUT_EXTRUDE12_DEPTH, mode=Mode.SUBTRACT)

    # Sketch33 → Cut-Extrude13 (cut)
    with BuildSketch(Plane(origin=(0, 105, 0), x_dir=(1, 0, 0), z_dir=(0, 1, 0))):
        with Locations((1, -13)):
            Rectangle(SKETCH33_W, SKETCH33_H)
    extrude(amount=-CUT_EXTRUDE13_DEPTH, mode=Mode.SUBTRACT)

    # Sketch38 → Boss-Extrude14 (add)
    with BuildSketch(Plane.XY.offset(2)):
        with Locations((56, 97)):
            Rectangle(SKETCH38_W, SKETCH38_H)
    extrude(amount=BOSS_EXTRUDE14_DEPTH)

    # Sketch39 → Boss-Extrude15 (add)
    with BuildSketch(Plane.XY.offset(2)):
        Polygon((66, 98.2), (66, 100.2), (71, 100.2), (71, 90.2), (69, 90.2), (69, 98.2), align=None)
    extrude(amount=BOSS_EXTRUDE15_DEPTH)

    # Sketch40 → Cut-Extrude15 (cut, two sides: drawn at the far end of the back side and taken through both)
    with BuildSketch(Plane(origin=(57, 0, 0), x_dir=(0, 0, -1), z_dir=(1, 0, 0)).offset(-CUT_EXTRUDE15_DEPTH_BACK)):
        with Locations(Location((-13.5, 105, 0), (0, 0, 180))):
            Circle(SKETCH40_R)
    extrude(amount=CUT_EXTRUDE15_DEPTH + CUT_EXTRUDE15_DEPTH_BACK, mode=Mode.SUBTRACT)


solid = part_2.part
